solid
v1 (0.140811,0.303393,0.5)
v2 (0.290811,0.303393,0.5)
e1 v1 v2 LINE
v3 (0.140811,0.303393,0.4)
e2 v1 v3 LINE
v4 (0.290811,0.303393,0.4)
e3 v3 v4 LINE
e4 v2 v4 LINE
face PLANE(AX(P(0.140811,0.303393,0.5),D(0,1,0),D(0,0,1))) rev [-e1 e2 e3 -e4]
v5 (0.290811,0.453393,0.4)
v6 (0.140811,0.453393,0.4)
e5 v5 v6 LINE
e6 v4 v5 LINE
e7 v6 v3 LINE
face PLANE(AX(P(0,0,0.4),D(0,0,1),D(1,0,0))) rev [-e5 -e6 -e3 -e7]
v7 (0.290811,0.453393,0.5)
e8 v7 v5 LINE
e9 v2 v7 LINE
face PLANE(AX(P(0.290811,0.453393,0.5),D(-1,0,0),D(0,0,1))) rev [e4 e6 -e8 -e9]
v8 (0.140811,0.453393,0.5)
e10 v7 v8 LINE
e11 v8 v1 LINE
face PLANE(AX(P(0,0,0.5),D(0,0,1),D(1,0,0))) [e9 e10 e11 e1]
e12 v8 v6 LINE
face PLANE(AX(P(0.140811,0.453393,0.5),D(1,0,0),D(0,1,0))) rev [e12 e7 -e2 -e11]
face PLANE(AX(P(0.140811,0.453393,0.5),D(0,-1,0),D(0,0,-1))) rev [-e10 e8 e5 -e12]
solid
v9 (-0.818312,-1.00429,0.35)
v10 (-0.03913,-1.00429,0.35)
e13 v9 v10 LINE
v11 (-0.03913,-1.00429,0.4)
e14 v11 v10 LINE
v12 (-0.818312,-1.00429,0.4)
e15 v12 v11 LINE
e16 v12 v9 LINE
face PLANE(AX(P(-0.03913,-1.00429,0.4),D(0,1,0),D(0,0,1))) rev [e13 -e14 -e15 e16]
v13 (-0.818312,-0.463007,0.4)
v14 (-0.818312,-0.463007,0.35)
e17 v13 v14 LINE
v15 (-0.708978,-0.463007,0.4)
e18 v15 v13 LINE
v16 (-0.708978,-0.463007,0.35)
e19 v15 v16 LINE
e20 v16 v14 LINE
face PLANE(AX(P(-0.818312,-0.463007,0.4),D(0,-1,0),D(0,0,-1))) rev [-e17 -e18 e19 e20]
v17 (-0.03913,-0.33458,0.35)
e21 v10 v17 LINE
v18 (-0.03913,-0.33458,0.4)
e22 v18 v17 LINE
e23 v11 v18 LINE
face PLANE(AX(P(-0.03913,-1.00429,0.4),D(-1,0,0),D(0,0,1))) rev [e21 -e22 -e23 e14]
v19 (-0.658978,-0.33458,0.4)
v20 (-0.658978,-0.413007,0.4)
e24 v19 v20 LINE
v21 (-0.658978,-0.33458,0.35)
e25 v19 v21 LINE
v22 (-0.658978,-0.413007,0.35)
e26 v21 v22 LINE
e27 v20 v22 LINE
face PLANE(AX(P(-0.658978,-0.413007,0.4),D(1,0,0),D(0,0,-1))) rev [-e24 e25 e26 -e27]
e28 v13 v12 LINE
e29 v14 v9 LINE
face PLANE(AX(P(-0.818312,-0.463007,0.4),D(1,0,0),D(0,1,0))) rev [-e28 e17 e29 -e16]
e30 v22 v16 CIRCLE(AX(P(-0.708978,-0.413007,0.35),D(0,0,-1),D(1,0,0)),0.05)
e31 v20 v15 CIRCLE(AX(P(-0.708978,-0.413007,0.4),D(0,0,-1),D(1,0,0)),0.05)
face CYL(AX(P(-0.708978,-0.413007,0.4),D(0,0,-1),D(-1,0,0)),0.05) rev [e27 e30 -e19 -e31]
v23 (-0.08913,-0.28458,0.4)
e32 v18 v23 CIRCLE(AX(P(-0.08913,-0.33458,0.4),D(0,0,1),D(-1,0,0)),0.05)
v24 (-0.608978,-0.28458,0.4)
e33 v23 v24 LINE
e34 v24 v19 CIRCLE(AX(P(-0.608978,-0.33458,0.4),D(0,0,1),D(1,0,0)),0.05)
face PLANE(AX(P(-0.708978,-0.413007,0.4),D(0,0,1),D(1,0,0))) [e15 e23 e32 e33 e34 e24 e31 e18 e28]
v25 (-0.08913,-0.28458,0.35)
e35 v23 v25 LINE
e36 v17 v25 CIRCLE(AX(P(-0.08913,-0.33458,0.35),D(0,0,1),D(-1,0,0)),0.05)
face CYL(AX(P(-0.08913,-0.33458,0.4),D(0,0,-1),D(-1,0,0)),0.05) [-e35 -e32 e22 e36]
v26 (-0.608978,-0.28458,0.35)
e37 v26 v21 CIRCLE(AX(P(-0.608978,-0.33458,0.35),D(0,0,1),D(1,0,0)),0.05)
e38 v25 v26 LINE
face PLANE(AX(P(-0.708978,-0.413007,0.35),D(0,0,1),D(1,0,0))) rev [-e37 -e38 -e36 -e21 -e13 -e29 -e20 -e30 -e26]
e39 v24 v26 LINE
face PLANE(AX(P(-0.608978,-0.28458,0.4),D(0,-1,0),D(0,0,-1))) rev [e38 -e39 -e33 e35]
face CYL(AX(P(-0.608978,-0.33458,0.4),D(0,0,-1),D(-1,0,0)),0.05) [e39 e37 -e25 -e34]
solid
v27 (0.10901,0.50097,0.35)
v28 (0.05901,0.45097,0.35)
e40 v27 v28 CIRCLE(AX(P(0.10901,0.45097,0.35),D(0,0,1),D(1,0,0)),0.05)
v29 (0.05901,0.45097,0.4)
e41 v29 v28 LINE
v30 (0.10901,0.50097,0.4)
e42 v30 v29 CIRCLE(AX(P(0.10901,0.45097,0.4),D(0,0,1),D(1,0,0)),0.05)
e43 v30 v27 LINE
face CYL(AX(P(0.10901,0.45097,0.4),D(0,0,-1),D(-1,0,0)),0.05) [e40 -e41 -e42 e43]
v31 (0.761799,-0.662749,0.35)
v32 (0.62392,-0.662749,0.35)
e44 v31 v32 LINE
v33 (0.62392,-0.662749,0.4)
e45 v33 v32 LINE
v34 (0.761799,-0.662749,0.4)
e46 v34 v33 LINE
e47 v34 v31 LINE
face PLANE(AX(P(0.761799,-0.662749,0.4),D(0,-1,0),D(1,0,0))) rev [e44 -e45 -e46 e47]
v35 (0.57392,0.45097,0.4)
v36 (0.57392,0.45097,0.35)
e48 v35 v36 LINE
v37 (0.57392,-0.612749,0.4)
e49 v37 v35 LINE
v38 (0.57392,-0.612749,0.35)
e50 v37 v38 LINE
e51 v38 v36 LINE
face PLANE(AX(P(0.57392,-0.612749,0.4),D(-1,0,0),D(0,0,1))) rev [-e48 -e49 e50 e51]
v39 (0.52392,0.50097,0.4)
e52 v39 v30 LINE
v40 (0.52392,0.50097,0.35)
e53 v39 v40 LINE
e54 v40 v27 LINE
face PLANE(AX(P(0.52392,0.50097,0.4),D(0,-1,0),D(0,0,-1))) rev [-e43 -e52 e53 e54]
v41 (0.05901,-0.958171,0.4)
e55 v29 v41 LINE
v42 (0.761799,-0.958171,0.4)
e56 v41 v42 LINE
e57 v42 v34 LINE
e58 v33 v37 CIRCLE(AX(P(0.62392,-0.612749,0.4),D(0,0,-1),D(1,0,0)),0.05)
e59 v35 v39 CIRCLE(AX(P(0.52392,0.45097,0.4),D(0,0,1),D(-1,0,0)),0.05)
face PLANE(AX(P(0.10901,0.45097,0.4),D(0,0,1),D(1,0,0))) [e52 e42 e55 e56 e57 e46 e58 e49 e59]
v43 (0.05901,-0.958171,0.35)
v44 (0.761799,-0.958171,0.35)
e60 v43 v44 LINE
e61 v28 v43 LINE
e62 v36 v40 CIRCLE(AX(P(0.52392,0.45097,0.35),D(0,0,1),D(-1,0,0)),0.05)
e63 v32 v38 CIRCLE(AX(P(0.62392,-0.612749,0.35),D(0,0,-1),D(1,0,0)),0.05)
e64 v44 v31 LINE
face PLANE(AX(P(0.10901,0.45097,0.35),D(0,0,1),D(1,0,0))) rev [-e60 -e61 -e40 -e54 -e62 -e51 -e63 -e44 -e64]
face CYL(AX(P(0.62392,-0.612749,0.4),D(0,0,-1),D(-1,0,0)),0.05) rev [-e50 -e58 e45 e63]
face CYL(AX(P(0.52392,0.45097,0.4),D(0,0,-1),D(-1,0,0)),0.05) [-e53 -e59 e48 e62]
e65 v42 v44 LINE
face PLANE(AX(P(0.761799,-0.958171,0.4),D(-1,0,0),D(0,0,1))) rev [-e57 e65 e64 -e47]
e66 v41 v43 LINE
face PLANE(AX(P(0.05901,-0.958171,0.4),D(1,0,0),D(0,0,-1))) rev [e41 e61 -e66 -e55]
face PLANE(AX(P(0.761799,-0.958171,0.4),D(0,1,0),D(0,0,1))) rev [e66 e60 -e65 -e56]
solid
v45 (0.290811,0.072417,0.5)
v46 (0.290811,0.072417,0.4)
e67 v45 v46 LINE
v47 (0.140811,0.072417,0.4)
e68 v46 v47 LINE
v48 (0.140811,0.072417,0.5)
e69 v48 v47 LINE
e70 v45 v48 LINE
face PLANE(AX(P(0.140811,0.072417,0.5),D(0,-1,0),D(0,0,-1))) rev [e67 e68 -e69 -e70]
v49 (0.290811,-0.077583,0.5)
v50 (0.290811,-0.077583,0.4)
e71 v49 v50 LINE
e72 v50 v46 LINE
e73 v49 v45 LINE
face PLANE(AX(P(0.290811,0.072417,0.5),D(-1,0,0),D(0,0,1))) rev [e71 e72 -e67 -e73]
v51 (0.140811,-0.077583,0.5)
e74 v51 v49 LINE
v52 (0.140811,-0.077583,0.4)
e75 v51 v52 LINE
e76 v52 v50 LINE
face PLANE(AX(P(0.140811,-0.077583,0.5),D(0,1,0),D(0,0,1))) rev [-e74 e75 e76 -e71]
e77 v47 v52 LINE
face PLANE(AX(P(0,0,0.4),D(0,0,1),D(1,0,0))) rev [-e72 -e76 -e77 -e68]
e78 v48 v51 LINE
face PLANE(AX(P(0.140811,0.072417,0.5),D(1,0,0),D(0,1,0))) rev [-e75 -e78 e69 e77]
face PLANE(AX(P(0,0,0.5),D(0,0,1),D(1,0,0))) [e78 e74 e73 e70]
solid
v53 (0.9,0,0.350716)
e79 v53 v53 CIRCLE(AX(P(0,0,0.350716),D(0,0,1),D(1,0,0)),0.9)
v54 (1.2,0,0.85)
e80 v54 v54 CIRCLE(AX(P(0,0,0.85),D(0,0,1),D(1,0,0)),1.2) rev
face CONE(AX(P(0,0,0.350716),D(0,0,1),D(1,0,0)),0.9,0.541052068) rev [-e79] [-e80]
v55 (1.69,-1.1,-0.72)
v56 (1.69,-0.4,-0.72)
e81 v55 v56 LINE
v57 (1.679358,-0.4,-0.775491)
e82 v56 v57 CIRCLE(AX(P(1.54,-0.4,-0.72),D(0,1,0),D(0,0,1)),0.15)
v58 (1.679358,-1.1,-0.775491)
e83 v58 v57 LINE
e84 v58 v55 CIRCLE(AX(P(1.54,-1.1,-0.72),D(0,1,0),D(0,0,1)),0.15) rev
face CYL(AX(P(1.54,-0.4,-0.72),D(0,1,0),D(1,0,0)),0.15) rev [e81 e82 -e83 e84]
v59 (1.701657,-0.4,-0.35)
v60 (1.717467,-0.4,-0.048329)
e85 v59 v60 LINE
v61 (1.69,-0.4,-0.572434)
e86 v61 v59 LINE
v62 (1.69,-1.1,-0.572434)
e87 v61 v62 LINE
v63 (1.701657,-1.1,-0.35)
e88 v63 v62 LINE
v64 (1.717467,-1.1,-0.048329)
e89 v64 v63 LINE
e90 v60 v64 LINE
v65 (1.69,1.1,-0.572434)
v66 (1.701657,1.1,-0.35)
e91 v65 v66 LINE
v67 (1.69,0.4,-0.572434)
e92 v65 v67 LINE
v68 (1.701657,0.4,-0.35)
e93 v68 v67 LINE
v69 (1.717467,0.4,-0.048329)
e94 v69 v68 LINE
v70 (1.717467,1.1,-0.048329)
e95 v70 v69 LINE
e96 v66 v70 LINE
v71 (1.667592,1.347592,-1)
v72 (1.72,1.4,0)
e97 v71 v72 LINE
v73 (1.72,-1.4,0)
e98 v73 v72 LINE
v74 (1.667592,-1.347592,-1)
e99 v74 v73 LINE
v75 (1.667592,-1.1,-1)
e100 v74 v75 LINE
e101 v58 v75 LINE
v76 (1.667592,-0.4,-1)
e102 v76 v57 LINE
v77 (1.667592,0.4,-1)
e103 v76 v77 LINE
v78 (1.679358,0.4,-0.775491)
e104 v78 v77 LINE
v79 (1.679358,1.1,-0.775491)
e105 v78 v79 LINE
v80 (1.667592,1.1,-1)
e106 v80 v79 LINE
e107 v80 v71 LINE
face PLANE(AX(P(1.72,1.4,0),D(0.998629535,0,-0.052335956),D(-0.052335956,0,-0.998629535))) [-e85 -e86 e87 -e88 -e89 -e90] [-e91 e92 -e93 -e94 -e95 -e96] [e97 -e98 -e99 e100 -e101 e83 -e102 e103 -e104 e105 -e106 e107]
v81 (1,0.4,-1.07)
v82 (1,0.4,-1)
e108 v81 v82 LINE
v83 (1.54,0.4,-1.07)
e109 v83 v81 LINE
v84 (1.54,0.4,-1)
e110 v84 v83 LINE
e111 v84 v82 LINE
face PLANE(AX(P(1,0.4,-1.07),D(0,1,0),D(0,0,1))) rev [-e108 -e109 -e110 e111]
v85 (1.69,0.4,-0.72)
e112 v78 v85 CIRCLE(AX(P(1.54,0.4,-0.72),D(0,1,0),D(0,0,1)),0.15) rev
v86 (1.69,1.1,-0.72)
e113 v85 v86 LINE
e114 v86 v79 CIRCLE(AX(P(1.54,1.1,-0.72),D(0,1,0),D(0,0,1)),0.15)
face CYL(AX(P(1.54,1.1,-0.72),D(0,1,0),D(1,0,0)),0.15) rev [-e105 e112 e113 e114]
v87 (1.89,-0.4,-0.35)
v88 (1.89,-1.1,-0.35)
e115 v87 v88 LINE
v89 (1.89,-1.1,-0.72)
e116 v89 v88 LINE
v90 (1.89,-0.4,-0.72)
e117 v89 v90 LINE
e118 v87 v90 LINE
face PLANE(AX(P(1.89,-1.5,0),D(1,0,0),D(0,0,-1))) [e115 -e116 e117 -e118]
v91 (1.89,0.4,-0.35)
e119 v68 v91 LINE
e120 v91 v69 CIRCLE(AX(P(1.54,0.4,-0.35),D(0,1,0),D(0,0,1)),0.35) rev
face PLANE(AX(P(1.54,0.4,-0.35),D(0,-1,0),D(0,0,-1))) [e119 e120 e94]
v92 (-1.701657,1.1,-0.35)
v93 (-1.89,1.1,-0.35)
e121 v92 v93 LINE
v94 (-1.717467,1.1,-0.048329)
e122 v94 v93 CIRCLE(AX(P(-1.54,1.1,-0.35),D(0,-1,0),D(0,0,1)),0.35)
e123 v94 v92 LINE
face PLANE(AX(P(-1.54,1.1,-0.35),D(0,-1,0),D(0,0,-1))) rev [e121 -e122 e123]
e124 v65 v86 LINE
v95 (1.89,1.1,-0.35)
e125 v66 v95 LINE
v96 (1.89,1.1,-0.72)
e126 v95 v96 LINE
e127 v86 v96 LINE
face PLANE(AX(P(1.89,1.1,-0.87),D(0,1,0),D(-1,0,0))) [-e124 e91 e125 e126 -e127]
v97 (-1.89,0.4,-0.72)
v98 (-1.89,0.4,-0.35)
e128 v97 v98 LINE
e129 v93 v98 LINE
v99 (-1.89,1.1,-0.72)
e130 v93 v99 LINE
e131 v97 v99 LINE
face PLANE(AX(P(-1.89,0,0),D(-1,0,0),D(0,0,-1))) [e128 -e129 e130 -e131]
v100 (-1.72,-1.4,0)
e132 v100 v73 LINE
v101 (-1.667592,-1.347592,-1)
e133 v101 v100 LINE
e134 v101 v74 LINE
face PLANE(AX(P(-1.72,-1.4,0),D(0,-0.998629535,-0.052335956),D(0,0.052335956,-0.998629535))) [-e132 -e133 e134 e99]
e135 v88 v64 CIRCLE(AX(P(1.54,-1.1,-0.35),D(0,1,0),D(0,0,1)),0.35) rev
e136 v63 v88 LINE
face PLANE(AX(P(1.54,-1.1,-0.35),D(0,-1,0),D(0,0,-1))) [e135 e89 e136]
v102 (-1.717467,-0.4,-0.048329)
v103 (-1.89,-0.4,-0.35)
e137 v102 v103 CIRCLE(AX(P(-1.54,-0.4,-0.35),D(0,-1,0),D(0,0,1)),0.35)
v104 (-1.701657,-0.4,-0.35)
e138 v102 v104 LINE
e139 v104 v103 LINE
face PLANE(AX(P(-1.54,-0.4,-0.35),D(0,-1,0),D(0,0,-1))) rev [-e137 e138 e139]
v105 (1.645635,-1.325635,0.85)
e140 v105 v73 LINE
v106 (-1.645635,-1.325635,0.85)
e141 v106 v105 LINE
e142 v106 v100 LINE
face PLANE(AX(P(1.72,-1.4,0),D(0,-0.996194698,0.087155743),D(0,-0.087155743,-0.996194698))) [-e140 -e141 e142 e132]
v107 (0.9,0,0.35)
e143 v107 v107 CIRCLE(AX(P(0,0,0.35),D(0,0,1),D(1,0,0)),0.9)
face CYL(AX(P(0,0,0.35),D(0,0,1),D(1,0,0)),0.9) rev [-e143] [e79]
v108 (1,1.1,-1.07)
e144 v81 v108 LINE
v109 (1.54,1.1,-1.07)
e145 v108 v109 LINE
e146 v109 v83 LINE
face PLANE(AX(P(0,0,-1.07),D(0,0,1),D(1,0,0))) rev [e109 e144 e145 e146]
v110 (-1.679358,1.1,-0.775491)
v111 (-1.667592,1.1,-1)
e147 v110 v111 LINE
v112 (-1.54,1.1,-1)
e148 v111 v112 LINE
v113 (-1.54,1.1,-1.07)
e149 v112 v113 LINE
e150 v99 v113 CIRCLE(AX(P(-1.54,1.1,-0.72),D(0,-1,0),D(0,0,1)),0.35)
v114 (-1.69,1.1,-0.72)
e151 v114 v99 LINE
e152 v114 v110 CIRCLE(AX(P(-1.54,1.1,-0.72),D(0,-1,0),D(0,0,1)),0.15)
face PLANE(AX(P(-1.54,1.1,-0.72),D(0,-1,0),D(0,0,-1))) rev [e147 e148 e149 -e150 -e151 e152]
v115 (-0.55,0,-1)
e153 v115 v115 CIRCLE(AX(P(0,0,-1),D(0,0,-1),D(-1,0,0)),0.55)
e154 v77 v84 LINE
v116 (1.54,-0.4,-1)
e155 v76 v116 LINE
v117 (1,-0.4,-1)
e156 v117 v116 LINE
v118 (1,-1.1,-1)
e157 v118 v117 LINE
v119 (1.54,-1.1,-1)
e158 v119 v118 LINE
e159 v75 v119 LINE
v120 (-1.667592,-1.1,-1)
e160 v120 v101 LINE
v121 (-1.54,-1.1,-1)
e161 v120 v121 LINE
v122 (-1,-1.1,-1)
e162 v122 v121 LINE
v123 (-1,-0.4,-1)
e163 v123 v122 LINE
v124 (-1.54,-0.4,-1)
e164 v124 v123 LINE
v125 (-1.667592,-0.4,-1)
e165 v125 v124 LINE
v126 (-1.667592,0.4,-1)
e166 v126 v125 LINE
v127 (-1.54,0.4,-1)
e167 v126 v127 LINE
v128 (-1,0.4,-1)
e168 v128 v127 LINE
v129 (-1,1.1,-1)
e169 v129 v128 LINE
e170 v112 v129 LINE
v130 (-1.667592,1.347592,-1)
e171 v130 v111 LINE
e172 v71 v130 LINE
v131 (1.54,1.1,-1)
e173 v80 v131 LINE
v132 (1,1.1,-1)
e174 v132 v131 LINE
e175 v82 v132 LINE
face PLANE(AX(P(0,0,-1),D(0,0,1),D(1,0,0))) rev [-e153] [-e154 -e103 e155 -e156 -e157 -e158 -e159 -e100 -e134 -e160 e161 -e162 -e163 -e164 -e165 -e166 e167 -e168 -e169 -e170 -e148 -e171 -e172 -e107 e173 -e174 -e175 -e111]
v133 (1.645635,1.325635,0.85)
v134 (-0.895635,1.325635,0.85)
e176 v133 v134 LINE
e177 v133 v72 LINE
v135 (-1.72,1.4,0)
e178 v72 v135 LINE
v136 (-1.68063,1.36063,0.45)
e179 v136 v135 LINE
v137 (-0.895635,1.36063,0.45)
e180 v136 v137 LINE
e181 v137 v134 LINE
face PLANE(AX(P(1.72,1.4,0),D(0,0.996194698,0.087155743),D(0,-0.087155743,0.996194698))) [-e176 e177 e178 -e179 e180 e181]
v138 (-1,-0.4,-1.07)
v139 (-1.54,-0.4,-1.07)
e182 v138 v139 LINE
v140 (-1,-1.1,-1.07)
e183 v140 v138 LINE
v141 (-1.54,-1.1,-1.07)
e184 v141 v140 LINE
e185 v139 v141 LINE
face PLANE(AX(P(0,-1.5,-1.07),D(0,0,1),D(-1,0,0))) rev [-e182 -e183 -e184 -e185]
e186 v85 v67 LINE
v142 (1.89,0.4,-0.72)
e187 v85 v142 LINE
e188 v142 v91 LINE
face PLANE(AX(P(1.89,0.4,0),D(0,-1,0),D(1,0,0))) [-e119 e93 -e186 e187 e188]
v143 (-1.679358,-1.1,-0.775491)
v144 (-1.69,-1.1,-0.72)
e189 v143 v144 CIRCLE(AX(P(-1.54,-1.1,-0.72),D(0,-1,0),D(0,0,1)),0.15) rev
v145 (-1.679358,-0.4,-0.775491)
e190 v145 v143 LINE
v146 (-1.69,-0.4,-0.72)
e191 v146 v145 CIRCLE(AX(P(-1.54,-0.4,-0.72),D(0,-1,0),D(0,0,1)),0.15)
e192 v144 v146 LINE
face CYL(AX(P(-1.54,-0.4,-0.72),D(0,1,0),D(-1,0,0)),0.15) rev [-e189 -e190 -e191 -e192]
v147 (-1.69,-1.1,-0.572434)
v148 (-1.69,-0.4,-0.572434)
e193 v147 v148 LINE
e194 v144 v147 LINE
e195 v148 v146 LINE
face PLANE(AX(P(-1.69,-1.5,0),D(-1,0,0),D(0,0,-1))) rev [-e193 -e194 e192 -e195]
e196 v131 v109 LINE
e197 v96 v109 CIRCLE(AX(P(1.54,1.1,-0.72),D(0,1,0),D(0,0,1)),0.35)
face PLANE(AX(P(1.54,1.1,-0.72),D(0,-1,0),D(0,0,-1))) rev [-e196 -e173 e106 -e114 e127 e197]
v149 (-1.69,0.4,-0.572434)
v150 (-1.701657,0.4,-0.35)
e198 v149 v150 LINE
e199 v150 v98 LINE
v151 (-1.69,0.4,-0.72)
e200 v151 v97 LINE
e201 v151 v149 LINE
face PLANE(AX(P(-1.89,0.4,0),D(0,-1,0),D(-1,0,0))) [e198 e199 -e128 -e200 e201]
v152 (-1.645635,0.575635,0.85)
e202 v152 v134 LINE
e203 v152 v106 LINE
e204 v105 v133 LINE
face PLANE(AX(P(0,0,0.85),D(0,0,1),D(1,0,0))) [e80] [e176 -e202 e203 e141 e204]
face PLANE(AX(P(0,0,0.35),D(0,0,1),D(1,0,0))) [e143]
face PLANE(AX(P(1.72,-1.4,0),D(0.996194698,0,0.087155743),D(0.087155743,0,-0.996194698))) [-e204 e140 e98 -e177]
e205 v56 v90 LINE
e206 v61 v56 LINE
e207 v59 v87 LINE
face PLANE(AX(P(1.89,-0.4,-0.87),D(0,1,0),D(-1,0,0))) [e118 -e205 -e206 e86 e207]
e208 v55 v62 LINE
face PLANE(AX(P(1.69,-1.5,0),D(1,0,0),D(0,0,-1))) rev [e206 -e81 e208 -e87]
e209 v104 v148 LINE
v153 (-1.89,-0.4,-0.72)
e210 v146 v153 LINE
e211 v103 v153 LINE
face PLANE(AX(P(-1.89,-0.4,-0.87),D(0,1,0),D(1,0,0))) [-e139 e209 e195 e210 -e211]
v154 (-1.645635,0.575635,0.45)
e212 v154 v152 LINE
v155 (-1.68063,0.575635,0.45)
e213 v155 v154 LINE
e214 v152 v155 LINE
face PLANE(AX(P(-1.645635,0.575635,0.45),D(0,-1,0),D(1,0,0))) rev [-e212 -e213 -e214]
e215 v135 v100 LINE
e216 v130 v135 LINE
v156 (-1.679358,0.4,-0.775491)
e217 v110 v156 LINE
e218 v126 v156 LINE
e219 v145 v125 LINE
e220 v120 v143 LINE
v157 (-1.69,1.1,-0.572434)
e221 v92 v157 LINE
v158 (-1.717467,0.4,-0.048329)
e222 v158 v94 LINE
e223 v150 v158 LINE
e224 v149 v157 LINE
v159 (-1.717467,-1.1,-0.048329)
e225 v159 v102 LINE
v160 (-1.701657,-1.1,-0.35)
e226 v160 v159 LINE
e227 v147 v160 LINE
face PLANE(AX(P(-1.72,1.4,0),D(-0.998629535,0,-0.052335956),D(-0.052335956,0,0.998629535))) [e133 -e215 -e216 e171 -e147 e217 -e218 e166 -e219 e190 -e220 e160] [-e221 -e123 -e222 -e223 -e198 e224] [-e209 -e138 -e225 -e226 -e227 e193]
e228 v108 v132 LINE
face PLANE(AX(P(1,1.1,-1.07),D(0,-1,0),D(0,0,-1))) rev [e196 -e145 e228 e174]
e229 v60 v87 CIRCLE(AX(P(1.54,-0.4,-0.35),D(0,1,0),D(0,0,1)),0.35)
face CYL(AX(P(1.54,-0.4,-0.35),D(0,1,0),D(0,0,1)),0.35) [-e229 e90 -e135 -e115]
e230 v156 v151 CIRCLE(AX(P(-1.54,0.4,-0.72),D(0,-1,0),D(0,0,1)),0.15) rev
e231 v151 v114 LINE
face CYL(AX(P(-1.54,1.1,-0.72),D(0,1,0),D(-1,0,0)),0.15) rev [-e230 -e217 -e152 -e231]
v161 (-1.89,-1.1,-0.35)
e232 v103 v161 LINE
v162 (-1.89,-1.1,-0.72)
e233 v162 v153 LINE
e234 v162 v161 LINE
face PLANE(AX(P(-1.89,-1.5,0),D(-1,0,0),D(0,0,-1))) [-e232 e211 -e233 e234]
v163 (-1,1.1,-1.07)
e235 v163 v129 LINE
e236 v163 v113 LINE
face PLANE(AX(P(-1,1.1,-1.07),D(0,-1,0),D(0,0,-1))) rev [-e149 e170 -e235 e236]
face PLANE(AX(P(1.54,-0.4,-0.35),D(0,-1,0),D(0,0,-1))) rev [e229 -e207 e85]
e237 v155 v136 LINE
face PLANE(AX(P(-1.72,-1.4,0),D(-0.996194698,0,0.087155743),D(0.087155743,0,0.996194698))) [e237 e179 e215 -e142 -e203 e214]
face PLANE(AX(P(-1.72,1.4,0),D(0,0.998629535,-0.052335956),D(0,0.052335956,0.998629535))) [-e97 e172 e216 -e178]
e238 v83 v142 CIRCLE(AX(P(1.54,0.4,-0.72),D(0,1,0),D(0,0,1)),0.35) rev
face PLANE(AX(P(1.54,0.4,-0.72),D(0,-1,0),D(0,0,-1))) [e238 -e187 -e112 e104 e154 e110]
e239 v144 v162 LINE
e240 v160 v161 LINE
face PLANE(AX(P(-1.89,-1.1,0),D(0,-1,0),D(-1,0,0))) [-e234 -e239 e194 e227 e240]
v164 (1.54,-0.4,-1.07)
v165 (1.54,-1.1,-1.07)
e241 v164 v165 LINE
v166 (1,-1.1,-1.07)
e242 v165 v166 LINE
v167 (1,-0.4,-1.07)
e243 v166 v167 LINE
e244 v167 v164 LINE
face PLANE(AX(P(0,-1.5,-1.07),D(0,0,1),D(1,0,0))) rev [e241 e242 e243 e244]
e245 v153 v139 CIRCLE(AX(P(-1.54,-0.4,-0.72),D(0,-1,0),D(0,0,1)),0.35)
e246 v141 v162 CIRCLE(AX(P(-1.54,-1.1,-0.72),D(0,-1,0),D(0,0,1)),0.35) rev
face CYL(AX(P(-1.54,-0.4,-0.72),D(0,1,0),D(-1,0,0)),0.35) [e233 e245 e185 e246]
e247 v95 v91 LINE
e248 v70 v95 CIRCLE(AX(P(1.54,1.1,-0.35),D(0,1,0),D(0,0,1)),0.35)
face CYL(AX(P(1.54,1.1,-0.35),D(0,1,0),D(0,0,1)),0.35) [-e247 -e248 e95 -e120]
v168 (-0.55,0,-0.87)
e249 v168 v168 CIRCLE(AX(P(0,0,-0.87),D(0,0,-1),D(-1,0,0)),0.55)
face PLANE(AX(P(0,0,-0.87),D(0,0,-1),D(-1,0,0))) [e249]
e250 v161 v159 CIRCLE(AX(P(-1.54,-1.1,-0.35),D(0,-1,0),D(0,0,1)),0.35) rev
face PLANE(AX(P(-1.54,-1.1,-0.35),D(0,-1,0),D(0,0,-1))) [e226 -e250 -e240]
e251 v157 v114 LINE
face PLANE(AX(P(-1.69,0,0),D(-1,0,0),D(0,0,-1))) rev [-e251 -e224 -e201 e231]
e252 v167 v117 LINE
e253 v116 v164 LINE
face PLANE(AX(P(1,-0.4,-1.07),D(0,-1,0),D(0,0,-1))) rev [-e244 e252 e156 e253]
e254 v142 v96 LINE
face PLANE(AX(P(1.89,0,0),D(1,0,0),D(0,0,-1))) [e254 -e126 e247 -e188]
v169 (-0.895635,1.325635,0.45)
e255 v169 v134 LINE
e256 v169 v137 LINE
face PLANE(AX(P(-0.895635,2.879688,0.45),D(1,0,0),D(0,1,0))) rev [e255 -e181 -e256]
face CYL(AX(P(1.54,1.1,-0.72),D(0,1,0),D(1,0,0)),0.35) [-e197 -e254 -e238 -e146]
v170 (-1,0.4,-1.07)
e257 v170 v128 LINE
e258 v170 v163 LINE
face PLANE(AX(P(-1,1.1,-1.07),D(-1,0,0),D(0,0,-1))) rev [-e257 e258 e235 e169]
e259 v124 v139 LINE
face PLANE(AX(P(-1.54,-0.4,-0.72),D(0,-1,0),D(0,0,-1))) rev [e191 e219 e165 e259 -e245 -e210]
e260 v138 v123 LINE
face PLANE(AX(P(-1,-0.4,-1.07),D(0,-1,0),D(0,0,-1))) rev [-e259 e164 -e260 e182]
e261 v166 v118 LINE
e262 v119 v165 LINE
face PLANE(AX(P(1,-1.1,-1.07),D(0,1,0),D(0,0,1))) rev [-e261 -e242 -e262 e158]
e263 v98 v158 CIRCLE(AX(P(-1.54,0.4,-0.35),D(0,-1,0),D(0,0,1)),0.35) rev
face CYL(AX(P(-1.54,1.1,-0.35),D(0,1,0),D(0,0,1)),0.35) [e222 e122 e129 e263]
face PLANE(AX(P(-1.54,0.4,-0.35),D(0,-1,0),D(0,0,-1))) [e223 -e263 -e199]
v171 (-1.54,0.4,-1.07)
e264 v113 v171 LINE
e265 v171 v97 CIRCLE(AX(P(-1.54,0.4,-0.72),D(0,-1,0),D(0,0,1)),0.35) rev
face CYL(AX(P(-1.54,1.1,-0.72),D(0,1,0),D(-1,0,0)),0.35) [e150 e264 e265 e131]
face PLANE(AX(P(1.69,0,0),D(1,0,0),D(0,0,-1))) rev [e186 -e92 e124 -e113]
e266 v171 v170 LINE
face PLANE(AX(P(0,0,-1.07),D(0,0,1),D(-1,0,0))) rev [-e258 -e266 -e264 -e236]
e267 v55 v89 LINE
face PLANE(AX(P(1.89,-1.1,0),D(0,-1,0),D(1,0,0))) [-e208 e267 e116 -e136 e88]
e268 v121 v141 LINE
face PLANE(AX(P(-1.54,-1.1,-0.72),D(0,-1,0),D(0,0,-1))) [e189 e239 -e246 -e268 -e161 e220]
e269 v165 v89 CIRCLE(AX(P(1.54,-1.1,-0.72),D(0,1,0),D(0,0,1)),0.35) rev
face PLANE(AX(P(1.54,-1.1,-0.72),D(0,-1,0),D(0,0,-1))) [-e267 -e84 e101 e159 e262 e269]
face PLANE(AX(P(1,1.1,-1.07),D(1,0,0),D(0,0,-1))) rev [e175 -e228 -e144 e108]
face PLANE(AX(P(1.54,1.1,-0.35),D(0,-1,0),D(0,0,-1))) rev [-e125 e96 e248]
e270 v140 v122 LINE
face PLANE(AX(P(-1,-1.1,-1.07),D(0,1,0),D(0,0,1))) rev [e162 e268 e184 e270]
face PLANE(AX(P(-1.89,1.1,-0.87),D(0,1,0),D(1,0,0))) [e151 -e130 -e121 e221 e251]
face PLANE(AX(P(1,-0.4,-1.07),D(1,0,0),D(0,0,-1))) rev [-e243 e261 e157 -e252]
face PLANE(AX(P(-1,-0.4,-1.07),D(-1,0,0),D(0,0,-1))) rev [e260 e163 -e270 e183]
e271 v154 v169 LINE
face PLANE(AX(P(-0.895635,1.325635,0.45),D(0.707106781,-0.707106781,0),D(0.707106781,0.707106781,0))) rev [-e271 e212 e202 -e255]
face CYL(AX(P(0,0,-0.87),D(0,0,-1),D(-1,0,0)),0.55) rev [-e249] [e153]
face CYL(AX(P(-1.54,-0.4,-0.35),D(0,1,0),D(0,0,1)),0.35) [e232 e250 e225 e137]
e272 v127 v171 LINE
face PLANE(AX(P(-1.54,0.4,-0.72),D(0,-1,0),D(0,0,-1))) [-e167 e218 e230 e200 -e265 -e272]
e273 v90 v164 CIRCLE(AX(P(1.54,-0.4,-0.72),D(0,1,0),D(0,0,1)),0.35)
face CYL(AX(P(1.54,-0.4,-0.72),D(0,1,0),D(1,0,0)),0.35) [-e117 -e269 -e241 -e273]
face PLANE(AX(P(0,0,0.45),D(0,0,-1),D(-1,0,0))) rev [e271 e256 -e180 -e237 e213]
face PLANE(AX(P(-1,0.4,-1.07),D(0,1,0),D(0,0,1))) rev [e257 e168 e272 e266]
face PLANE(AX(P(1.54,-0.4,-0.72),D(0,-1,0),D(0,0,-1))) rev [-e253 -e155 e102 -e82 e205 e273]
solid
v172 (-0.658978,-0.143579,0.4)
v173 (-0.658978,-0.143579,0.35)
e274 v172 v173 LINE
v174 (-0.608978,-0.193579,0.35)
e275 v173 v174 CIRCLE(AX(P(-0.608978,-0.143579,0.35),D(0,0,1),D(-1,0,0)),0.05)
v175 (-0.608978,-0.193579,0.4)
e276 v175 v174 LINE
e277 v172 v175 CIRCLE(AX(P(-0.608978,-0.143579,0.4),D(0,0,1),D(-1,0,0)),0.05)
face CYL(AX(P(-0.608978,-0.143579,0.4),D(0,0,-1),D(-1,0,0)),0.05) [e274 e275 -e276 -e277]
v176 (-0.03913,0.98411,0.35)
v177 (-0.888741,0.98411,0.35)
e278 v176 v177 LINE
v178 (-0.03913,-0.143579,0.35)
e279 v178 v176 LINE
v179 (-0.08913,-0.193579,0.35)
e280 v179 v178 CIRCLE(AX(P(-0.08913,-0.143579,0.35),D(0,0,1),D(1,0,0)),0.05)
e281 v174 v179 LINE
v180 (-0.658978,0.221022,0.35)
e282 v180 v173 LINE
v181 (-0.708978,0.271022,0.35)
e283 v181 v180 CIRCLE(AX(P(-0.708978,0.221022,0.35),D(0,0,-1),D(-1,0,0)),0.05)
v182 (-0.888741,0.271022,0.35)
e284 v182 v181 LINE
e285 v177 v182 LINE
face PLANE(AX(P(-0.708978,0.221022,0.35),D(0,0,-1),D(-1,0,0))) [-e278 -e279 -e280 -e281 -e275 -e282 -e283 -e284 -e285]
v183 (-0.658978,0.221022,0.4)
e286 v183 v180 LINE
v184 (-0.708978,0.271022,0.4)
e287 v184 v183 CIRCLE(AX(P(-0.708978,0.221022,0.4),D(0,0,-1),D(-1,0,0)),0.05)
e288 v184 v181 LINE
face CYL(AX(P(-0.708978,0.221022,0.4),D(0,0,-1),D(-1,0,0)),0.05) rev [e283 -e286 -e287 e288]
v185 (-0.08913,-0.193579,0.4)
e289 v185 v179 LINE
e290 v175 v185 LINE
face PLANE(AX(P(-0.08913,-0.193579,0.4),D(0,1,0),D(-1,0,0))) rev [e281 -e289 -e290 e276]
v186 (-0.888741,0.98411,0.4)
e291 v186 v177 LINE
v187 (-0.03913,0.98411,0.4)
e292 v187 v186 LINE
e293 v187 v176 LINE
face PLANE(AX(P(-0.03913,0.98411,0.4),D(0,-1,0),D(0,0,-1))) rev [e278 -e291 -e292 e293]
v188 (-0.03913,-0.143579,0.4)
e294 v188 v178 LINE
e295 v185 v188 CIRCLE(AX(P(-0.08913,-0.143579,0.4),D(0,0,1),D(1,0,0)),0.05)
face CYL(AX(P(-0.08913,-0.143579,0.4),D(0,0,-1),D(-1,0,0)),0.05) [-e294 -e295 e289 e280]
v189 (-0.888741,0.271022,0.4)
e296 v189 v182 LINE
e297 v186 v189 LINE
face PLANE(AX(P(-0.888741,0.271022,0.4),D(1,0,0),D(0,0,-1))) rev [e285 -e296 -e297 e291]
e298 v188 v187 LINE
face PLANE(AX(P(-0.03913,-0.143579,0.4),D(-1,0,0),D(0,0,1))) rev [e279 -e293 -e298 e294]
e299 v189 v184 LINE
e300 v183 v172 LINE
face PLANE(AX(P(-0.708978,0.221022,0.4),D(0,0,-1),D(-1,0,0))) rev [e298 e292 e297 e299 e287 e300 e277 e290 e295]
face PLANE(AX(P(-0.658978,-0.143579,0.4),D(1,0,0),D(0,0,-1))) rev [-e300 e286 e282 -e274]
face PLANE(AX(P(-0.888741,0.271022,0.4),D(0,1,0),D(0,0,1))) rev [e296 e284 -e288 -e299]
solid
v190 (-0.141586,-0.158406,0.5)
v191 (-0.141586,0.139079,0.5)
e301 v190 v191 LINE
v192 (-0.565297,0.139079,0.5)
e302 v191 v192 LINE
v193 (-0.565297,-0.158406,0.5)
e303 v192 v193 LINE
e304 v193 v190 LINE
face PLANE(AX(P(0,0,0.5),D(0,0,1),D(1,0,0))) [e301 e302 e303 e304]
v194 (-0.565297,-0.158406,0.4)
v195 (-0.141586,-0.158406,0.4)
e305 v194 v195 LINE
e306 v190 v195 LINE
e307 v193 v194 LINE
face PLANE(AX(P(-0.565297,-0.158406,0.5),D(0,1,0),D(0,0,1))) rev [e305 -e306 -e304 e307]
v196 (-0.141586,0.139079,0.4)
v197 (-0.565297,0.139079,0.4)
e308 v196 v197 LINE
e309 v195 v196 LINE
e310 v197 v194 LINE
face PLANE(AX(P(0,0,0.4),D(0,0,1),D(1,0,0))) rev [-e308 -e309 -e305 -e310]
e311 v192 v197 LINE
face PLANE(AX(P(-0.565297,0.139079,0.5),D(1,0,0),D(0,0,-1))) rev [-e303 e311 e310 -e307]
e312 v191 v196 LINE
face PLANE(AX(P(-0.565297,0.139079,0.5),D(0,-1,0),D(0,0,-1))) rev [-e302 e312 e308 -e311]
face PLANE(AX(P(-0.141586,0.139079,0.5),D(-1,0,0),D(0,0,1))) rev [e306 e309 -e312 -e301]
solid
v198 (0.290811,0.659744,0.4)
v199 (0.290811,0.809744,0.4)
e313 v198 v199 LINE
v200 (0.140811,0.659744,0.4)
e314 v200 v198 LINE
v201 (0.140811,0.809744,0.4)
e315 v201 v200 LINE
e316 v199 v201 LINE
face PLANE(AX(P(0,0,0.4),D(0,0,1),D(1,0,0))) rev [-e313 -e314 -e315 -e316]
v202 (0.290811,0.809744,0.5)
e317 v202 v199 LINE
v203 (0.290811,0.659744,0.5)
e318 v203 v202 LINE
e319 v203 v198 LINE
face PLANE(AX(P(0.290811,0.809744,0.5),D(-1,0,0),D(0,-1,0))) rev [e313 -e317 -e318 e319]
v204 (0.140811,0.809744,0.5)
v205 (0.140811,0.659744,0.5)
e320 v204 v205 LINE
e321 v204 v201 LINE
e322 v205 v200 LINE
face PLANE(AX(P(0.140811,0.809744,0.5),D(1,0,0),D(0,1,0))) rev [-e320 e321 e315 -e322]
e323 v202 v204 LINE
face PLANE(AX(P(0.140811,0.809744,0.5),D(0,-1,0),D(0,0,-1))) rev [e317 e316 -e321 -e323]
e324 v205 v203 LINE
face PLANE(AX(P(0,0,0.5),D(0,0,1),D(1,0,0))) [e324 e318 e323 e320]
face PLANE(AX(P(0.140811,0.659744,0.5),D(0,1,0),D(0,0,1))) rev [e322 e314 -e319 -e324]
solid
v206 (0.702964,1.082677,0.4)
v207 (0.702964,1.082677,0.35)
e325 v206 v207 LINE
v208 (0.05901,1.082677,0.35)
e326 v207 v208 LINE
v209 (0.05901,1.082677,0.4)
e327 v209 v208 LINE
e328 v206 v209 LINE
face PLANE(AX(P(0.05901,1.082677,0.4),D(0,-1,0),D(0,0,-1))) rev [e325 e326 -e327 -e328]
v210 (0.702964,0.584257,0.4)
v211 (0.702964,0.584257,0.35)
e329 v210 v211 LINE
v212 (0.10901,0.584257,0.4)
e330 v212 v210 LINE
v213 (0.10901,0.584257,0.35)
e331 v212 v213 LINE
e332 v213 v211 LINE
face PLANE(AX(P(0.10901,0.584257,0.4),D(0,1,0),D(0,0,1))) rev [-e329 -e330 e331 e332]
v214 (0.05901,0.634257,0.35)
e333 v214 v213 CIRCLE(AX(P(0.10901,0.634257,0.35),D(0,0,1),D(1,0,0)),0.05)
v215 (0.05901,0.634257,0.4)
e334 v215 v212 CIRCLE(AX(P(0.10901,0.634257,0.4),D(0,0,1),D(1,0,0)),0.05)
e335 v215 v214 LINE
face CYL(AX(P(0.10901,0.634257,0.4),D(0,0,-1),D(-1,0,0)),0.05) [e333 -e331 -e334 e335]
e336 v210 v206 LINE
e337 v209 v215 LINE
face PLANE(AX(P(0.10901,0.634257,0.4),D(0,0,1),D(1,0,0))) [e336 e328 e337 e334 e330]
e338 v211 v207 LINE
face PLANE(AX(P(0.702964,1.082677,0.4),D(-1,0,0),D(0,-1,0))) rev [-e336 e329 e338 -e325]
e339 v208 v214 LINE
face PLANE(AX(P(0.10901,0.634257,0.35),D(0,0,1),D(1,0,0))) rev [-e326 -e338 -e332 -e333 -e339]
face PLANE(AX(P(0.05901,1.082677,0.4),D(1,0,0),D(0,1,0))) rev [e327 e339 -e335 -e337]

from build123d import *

# Parameters (mm, degrees)
SKETCH_1_W                       = 3.44
SKETCH_1_H                       = 2.8
EXTRUDE_1_DEPTH                  = 1
EXTRUDE_1_DRAFT                  = -3
SKETCH_3_R                       = 0.55
SKETCH_3_W                       = 0.667592221
SKETCH_3_H                       = 0.7
CUT_EXTRUDE_1_DEPTH              = 0.13
SKETCH_5_W                       = 0.69
SKETCH_5_H                       = 0.7
SM_BASE_FLANGE_1_DEPTH           = 0.2
SM_EDGE_FLANGE_1_STRIP_W         = 1.1
SM_EDGE_FLANGE_1_STRIP_H         = 0.2
SM_EDGE_FLANGE_1_STRIP_CUT_DEPTH = 0.7
SM_EDGE_FLANGE_1_DEPTH           = 0.7
SM_EDGE_FLANGE_2_STRIP_W         = 1.1
SM_EDGE_FLANGE_2_STRIP_H         = 0.2
SM_EDGE_FLANGE_2_STRIP_CUT_DEPTH = 0.7
SM_EDGE_FLANGE_2_DEPTH           = 0.7
PATTERN_LINEAR_1_COUNT           = 2
PATTERN_LINEAR_1_PITCH           = 1.5
SKETCH_30_W                      = 3.44
SKETCH_30_H                      = 2.8
EXTRUDE_3_DEPTH                  = 0.85
EXTRUDE_3_TAPER                  = 5
CUT_EXTRUDE_2_DEPTH              = 0.4
SKETCH_34_R                      = 0.9
CUT_EXTRUDE_3_DEPTH              = 0.5
CHAMFER_1_SIZE                   = 0.3
CHAMFER_1_SIZE2                  = 0.499283845
EXTRUDE_4_DEPTH                  = 0.05
EXTRUDE_4_2_DEPTH                = 0.05
EXTRUDE_4_3_DEPTH                = 0.05
EXTRUDE_4_4_DEPTH                = 0.05
SKETCH_49_W                      = 0.423711769
SKETCH_49_H                      = 0.297484251
EXTRUDE_5_DEPTH                  = 0.1
SKETCH_49_W_2                    = 0.15
SKETCH_49_H_2                    = 0.15
EXTRUDE_5_2_DEPTH                = 0.1
EXTRUDE_5_3_DEPTH                = 0.1
EXTRUDE_5_4_DEPTH                = 0.1


# Sheet-metal steps are written as plain solids
with BuildPart() as part:
    # Sketch 1 → Бобышка-Вытянуть1 (with draft: the straight prism first)
    with BuildSketch(Plane.XY):
        Rectangle(SKETCH_1_W, SKETCH_1_H)
    extrude(amount=-EXTRUDE_1_DEPTH)
    # Бобышка-Вытянуть1: the draft: its side faces are tilted about the plane it starts from
    extrude_1_sides = [part.faces().sort_by_distance(p)[0] for p in [
        (-1.72, 0, -0.5),
        (0, -1.4, -0.5),
        (1.72, 0, -0.5),
        (0, 1.4, -0.5),
    ]]
    draft(extrude_1_sides, Plane.XY, EXTRUDE_1_DRAFT)

    # Sketch 3 → Вырез-Вытянуть1 (cut)
    with BuildSketch(Plane(origin=(0, 0, -1), x_dir=(-1, 0, 0), z_dir=(0, 0, -1))):
        Circle(SKETCH_3_R)
        with Locations((-1.333796111, 0.75)):
            Rectangle(SKETCH_3_W, SKETCH_3_H)
        with Locations((1.333796111, 0.75)):
            Rectangle(SKETCH_3_W, SKETCH_3_H)
        with Locations((-1.333796111, -0.75)):
            Rectangle(SKETCH_3_W, SKETCH_3_H)
        with Locations((1.333796111, -0.75)):
            Rectangle(SKETCH_3_W, SKETCH_3_H)
    extrude(amount=-CUT_EXTRUDE_1_DEPTH, mode=Mode.SUBTRACT)



with BuildPart() as body_2:
    # Sketch 5 → Базовая кромка1 (new body)
    with BuildSketch(Plane(origin=(0, 0, -0.87), x_dir=(-1, 0, 0), z_dir=(0, 0, -1))):
        with Locations((-1.345, 0.75)):
            Rectangle(SKETCH_5_W, SKETCH_5_H)
    extrude(amount=SM_BASE_FLANGE_1_DEPTH)

    # Ребро-кромка1 strip (across the edge) → Ребро-кромка1 strip cut (cut)
    with BuildSketch(Plane(origin=(1.69, 0.4, -0.87), x_dir=(-1, 0, 0), z_dir=(0, 1, 0))):
        with Locations((-0.4, -0.1)):
            Rectangle(SM_EDGE_FLANGE_1_STRIP_W, SM_EDGE_FLANGE_1_STRIP_H)
    extrude(amount=SM_EDGE_FLANGE_1_STRIP_CUT_DEPTH, mode=Mode.SUBTRACT)

    # Ребро-кромка1 section (across the edge) → Ребро-кромка1 (add)
    with BuildSketch(Plane(origin=(1.69, 0.4, -0.87), x_dir=(-1, 0, 0), z_dir=(0, 1, 0))):
        with BuildLine():
            Line((-0.2, 0.15), (-0.2, 0.87))
            Line((-0.2, 0.87), (0, 0.87))
            Line((0, 0.87), (0, 0.15))
            ThreePointArc((0, 0.15), (0.043933983, 0.043933983), (0.15, 0))
            Line((0.15, 0), (0.15, -0.2))
            ThreePointArc((0.15, -0.2), (-0.097487373, -0.097487373), (-0.2, 0.15))
        make_face()
    extrude(amount=SM_EDGE_FLANGE_1_DEPTH)

    # Ребро-кромка2 strip (across the edge) → Ребро-кромка2 strip cut (cut)
    with BuildSketch(Plane(origin=(1.69, 0.4, 0), x_dir=(0, 0, -1), z_dir=(0, 1, 0))):
        with Locations((-0.2, -0.1)):
            Rectangle(SM_EDGE_FLANGE_2_STRIP_W, SM_EDGE_FLANGE_2_STRIP_H)
    extrude(amount=SM_EDGE_FLANGE_2_STRIP_CUT_DEPTH, mode=Mode.SUBTRACT)

    # Ребро-кромка2 section (across the edge) → Ребро-кромка2 (add)
    with BuildSketch(Plane(origin=(1.69, 0.4, 0), x_dir=(0, 0, -1), z_dir=(0, 1, 0))):
        with BuildLine():
            Line((0, 0.15), (0, 0.4))
            Line((0, 0.4), (0.2, 0.4))
            Line((0.2, 0.4), (0.2, 0.15))
            ThreePointArc((0.2, 0.15), (0.243933983, 0.043933983), (0.35, 0))
            Line((0.35, 0), (0.35, -0.2))
            ThreePointArc((0.35, -0.2), (0.102512627, -0.097487373), (0, 0.15))
        make_face()
    extrude(amount=SM_EDGE_FLANGE_2_DEPTH)


with BuildPart() as pattern_linear_1_1:
    # Линейный массив1: pattern copy
    add(body_2.part.moved(Location(Vector(0, -1, 0) * (1 * PATTERN_LINEAR_1_PITCH))))


with BuildPart() as body_4:
    # Зеркальное отражение1: mirrored copy
    add(body_2.part.mirror(Plane(origin=(0, 0, 0), x_dir=(0, 0, 1), z_dir=(1, 0, 0))))


with BuildPart() as body_5:
    # Mirror 1 2: mirrored copy
    add(pattern_linear_1_1.part.mirror(Plane(origin=(0, 0, 0), x_dir=(0, 0, 1), z_dir=(1, 0, 0))))


with BuildPart() as part_1:
    add(part.part)

    add(body_2.part)  # Бобышка-Вытянуть3 merges body 2

    add(pattern_linear_1_1.part)  # Бобышка-Вытянуть3 merges Линейный массив1_1

    add(body_4.part)  # Бобышка-Вытянуть3 merges body 4

    add(body_5.part)  # Бобышка-Вытянуть3 merges body 5
    # Эскиз30 → Бобышка-Вытянуть3 (add)
    with BuildSketch(Plane.XY):
        Rectangle(SKETCH_30_W, SKETCH_30_H)
    extrude(amount=EXTRUDE_3_DEPTH, taper=EXTRUDE_3_TAPER)

    # Эскиз33 → Вырез-Вытянуть2 (cut)
    with BuildSketch(Plane.XY.offset(0.85)):
        Polygon((-0.895634636, 1.325634636), (-1.645634636, 0.575634636), (-2.879687624, 0.575634636), (-2.879687624, 2.879687624), (-0.895634636, 2.879687624), align=None)
    extrude(amount=-CUT_EXTRUDE_2_DEPTH, mode=Mode.SUBTRACT)

    # Эскиз34 → Вырез-Вытянуть3 (cut)
    with BuildSketch(Plane.XY.offset(0.85)):
        Circle(SKETCH_34_R)
    extrude(amount=-CUT_EXTRUDE_3_DEPTH, mode=Mode.SUBTRACT)

    # Фаска1
    chamfer_1_edges = [part_1.edges().sort_by_distance(p)[0] for p in [
        (-0.9, 0, 0.85),
    ]]
    chamfer_1_side = [part_1.faces().sort_by_distance(p)[0] for p in [
        (0, -1.283371553, 0.85),
    ]]
    chamfer(chamfer_1_edges, length=CHAMFER_1_SIZE, length2=CHAMFER_1_SIZE2, reference=chamfer_1_side[0])


with BuildPart() as body_2_2:
    # Эскиз48 → Бобышка-Вытянуть4 (new body)
    with BuildSketch(Plane.XY.offset(0.35)):
        with BuildLine():
            Line((0.059009947, -0.958170677), (0.059009947, 0.45096966))
            ThreePointArc((0.059009947, 0.45096966), (0.073654608, 0.486324999), (0.109009947, 0.50096966))
            Line((0.109009947, 0.50096966), (0.523920369, 0.50096966))
            ThreePointArc((0.523920369, 0.50096966), (0.559275708, 0.486324999), (0.573920369, 0.45096966))
            Line((0.573920369, 0.45096966), (0.573920369, -0.612749155))
            ThreePointArc((0.573920369, -0.612749155), (0.58856503, -0.648104494), (0.623920369, -0.662749155))
            Line((0.623920369, -0.662749155), (0.761798951, -0.662749155))
            Line((0.761798951, -0.662749155), (0.761798951, -0.958170677))
            Line((0.761798951, -0.958170677), (0.059009947, -0.958170677))
        make_face()
    extrude(amount=EXTRUDE_4_DEPTH)


with BuildPart() as body_3:
    # Эскиз48 → Extrude 4 2 (new body)
    with BuildSketch(Plane.XY.offset(0.35)):
        with BuildLine():
            Line((0.059009947, 1.082676661), (0.702963992, 1.082676661))
            Line((0.702963992, 1.082676661), (0.702963992, 0.584256601))
            Line((0.702963992, 0.584256601), (0.109009947, 0.584256601))
            ThreePointArc((0.109009947, 0.584256601), (0.073654608, 0.598901262), (0.059009947, 0.634256601))
            Line((0.059009947, 0.634256601), (0.059009947, 1.082676661))
        make_face()
    extrude(amount=EXTRUDE_4_2_DEPTH)


with BuildPart() as body_4_2:
    # Эскиз48 → Extrude 4 3 (new body)
    with BuildSketch(Plane.XY.offset(0.35)):
        with BuildLine():
            Line((-0.039130176, -1.004290426), (-0.039130176, -0.334579702))
            ThreePointArc((-0.039130176, -0.334579702), (-0.053774837, -0.299224363), (-0.089130176, -0.284579702))
            Line((-0.089130176, -0.284579702), (-0.608977855, -0.284579702))
            ThreePointArc((-0.608977855, -0.284579702), (-0.644333194, -0.299224363), (-0.658977855, -0.334579702))
            Line((-0.658977855, -0.334579702), (-0.658977855, -0.413006558))
            ThreePointArc((-0.658977855, -0.413006558), (-0.673622516, -0.448361897), (-0.708977855, -0.463006558))
            Line((-0.708977855, -0.463006558), (-0.818312154, -0.463006558))
            Line((-0.818312154, -0.463006558), (-0.818312154, -1.004290426))
            Line((-0.818312154, -1.004290426), (-0.039130176, -1.004290426))
        make_face()
    extrude(amount=EXTRUDE_4_3_DEPTH)


with BuildPart() as body_5_2:
    # Эскиз48 → Extrude 4 4 (new body)
    with BuildSketch(Plane.XY.offset(0.35)):
        with BuildLine():
            Line((-0.039130176, 0.984110402), (-0.888741187, 0.984110402))
            Line((-0.888741187, 0.984110402), (-0.888741187, 0.271021616))
            Line((-0.888741187, 0.271021616), (-0.708977855, 0.271021616))
            ThreePointArc((-0.708977855, 0.271021616), (-0.673622516, 0.256376955), (-0.658977855, 0.221021616))
            Line((-0.658977855, 0.221021616), (-0.658977855, -0.143579013))
            ThreePointArc((-0.658977855, -0.143579013), (-0.644333194, -0.178934352), (-0.608977855, -0.193579013))
            Line((-0.608977855, -0.193579013), (-0.089130176, -0.193579013))
            ThreePointArc((-0.089130176, -0.193579013), (-0.053774837, -0.178934352), (-0.039130176, -0.143579013))
            Line((-0.039130176, -0.143579013), (-0.039130176, 0.984110402))
        make_face()
    extrude(amount=EXTRUDE_4_4_DEPTH)


with BuildPart() as body_6:
    # Эскиз49 → Бобышка-Вытянуть5 (new body)
    with BuildSketch(Plane.XY.offset(0.4)):
        with Locations((-0.353441563, -0.009663473)):
            Rectangle(SKETCH_49_W, SKETCH_49_H)
    extrude(amount=EXTRUDE_5_DEPTH)


with BuildPart() as body_7:
    # Эскиз49 → Extrude 5 2 (new body)
    with BuildSketch(Plane.XY.offset(0.4)):
        with Locations((0.215810569, 0.734743971)):
            Rectangle(SKETCH_49_W_2, SKETCH_49_H_2)
    extrude(amount=EXTRUDE_5_2_DEPTH)


with BuildPart() as body_8:
    # Эскиз49 → Extrude 5 3 (new body)
    with BuildSketch(Plane.XY.offset(0.4)):
        with Locations((0.215810569, 0.378392896)):
            Rectangle(SKETCH_49_W_2, SKETCH_49_H_2)
    extrude(amount=EXTRUDE_5_3_DEPTH)


with BuildPart() as body_9:
    # Эскиз49 → Extrude 5 4 (new body)
    with BuildSketch(Plane.XY.offset(0.4)):
        with Locations((0.215810569, -0.002583161)):
            Rectangle(SKETCH_49_W_2, SKETCH_49_H_2)
    extrude(amount=EXTRUDE_5_4_DEPTH)


solid = Compound([part_1.part, body_2_2.part, body_3.part, body_4_2.part, body_5_2.part, body_6.part, body_7.part, body_8.part, body_9.part])
